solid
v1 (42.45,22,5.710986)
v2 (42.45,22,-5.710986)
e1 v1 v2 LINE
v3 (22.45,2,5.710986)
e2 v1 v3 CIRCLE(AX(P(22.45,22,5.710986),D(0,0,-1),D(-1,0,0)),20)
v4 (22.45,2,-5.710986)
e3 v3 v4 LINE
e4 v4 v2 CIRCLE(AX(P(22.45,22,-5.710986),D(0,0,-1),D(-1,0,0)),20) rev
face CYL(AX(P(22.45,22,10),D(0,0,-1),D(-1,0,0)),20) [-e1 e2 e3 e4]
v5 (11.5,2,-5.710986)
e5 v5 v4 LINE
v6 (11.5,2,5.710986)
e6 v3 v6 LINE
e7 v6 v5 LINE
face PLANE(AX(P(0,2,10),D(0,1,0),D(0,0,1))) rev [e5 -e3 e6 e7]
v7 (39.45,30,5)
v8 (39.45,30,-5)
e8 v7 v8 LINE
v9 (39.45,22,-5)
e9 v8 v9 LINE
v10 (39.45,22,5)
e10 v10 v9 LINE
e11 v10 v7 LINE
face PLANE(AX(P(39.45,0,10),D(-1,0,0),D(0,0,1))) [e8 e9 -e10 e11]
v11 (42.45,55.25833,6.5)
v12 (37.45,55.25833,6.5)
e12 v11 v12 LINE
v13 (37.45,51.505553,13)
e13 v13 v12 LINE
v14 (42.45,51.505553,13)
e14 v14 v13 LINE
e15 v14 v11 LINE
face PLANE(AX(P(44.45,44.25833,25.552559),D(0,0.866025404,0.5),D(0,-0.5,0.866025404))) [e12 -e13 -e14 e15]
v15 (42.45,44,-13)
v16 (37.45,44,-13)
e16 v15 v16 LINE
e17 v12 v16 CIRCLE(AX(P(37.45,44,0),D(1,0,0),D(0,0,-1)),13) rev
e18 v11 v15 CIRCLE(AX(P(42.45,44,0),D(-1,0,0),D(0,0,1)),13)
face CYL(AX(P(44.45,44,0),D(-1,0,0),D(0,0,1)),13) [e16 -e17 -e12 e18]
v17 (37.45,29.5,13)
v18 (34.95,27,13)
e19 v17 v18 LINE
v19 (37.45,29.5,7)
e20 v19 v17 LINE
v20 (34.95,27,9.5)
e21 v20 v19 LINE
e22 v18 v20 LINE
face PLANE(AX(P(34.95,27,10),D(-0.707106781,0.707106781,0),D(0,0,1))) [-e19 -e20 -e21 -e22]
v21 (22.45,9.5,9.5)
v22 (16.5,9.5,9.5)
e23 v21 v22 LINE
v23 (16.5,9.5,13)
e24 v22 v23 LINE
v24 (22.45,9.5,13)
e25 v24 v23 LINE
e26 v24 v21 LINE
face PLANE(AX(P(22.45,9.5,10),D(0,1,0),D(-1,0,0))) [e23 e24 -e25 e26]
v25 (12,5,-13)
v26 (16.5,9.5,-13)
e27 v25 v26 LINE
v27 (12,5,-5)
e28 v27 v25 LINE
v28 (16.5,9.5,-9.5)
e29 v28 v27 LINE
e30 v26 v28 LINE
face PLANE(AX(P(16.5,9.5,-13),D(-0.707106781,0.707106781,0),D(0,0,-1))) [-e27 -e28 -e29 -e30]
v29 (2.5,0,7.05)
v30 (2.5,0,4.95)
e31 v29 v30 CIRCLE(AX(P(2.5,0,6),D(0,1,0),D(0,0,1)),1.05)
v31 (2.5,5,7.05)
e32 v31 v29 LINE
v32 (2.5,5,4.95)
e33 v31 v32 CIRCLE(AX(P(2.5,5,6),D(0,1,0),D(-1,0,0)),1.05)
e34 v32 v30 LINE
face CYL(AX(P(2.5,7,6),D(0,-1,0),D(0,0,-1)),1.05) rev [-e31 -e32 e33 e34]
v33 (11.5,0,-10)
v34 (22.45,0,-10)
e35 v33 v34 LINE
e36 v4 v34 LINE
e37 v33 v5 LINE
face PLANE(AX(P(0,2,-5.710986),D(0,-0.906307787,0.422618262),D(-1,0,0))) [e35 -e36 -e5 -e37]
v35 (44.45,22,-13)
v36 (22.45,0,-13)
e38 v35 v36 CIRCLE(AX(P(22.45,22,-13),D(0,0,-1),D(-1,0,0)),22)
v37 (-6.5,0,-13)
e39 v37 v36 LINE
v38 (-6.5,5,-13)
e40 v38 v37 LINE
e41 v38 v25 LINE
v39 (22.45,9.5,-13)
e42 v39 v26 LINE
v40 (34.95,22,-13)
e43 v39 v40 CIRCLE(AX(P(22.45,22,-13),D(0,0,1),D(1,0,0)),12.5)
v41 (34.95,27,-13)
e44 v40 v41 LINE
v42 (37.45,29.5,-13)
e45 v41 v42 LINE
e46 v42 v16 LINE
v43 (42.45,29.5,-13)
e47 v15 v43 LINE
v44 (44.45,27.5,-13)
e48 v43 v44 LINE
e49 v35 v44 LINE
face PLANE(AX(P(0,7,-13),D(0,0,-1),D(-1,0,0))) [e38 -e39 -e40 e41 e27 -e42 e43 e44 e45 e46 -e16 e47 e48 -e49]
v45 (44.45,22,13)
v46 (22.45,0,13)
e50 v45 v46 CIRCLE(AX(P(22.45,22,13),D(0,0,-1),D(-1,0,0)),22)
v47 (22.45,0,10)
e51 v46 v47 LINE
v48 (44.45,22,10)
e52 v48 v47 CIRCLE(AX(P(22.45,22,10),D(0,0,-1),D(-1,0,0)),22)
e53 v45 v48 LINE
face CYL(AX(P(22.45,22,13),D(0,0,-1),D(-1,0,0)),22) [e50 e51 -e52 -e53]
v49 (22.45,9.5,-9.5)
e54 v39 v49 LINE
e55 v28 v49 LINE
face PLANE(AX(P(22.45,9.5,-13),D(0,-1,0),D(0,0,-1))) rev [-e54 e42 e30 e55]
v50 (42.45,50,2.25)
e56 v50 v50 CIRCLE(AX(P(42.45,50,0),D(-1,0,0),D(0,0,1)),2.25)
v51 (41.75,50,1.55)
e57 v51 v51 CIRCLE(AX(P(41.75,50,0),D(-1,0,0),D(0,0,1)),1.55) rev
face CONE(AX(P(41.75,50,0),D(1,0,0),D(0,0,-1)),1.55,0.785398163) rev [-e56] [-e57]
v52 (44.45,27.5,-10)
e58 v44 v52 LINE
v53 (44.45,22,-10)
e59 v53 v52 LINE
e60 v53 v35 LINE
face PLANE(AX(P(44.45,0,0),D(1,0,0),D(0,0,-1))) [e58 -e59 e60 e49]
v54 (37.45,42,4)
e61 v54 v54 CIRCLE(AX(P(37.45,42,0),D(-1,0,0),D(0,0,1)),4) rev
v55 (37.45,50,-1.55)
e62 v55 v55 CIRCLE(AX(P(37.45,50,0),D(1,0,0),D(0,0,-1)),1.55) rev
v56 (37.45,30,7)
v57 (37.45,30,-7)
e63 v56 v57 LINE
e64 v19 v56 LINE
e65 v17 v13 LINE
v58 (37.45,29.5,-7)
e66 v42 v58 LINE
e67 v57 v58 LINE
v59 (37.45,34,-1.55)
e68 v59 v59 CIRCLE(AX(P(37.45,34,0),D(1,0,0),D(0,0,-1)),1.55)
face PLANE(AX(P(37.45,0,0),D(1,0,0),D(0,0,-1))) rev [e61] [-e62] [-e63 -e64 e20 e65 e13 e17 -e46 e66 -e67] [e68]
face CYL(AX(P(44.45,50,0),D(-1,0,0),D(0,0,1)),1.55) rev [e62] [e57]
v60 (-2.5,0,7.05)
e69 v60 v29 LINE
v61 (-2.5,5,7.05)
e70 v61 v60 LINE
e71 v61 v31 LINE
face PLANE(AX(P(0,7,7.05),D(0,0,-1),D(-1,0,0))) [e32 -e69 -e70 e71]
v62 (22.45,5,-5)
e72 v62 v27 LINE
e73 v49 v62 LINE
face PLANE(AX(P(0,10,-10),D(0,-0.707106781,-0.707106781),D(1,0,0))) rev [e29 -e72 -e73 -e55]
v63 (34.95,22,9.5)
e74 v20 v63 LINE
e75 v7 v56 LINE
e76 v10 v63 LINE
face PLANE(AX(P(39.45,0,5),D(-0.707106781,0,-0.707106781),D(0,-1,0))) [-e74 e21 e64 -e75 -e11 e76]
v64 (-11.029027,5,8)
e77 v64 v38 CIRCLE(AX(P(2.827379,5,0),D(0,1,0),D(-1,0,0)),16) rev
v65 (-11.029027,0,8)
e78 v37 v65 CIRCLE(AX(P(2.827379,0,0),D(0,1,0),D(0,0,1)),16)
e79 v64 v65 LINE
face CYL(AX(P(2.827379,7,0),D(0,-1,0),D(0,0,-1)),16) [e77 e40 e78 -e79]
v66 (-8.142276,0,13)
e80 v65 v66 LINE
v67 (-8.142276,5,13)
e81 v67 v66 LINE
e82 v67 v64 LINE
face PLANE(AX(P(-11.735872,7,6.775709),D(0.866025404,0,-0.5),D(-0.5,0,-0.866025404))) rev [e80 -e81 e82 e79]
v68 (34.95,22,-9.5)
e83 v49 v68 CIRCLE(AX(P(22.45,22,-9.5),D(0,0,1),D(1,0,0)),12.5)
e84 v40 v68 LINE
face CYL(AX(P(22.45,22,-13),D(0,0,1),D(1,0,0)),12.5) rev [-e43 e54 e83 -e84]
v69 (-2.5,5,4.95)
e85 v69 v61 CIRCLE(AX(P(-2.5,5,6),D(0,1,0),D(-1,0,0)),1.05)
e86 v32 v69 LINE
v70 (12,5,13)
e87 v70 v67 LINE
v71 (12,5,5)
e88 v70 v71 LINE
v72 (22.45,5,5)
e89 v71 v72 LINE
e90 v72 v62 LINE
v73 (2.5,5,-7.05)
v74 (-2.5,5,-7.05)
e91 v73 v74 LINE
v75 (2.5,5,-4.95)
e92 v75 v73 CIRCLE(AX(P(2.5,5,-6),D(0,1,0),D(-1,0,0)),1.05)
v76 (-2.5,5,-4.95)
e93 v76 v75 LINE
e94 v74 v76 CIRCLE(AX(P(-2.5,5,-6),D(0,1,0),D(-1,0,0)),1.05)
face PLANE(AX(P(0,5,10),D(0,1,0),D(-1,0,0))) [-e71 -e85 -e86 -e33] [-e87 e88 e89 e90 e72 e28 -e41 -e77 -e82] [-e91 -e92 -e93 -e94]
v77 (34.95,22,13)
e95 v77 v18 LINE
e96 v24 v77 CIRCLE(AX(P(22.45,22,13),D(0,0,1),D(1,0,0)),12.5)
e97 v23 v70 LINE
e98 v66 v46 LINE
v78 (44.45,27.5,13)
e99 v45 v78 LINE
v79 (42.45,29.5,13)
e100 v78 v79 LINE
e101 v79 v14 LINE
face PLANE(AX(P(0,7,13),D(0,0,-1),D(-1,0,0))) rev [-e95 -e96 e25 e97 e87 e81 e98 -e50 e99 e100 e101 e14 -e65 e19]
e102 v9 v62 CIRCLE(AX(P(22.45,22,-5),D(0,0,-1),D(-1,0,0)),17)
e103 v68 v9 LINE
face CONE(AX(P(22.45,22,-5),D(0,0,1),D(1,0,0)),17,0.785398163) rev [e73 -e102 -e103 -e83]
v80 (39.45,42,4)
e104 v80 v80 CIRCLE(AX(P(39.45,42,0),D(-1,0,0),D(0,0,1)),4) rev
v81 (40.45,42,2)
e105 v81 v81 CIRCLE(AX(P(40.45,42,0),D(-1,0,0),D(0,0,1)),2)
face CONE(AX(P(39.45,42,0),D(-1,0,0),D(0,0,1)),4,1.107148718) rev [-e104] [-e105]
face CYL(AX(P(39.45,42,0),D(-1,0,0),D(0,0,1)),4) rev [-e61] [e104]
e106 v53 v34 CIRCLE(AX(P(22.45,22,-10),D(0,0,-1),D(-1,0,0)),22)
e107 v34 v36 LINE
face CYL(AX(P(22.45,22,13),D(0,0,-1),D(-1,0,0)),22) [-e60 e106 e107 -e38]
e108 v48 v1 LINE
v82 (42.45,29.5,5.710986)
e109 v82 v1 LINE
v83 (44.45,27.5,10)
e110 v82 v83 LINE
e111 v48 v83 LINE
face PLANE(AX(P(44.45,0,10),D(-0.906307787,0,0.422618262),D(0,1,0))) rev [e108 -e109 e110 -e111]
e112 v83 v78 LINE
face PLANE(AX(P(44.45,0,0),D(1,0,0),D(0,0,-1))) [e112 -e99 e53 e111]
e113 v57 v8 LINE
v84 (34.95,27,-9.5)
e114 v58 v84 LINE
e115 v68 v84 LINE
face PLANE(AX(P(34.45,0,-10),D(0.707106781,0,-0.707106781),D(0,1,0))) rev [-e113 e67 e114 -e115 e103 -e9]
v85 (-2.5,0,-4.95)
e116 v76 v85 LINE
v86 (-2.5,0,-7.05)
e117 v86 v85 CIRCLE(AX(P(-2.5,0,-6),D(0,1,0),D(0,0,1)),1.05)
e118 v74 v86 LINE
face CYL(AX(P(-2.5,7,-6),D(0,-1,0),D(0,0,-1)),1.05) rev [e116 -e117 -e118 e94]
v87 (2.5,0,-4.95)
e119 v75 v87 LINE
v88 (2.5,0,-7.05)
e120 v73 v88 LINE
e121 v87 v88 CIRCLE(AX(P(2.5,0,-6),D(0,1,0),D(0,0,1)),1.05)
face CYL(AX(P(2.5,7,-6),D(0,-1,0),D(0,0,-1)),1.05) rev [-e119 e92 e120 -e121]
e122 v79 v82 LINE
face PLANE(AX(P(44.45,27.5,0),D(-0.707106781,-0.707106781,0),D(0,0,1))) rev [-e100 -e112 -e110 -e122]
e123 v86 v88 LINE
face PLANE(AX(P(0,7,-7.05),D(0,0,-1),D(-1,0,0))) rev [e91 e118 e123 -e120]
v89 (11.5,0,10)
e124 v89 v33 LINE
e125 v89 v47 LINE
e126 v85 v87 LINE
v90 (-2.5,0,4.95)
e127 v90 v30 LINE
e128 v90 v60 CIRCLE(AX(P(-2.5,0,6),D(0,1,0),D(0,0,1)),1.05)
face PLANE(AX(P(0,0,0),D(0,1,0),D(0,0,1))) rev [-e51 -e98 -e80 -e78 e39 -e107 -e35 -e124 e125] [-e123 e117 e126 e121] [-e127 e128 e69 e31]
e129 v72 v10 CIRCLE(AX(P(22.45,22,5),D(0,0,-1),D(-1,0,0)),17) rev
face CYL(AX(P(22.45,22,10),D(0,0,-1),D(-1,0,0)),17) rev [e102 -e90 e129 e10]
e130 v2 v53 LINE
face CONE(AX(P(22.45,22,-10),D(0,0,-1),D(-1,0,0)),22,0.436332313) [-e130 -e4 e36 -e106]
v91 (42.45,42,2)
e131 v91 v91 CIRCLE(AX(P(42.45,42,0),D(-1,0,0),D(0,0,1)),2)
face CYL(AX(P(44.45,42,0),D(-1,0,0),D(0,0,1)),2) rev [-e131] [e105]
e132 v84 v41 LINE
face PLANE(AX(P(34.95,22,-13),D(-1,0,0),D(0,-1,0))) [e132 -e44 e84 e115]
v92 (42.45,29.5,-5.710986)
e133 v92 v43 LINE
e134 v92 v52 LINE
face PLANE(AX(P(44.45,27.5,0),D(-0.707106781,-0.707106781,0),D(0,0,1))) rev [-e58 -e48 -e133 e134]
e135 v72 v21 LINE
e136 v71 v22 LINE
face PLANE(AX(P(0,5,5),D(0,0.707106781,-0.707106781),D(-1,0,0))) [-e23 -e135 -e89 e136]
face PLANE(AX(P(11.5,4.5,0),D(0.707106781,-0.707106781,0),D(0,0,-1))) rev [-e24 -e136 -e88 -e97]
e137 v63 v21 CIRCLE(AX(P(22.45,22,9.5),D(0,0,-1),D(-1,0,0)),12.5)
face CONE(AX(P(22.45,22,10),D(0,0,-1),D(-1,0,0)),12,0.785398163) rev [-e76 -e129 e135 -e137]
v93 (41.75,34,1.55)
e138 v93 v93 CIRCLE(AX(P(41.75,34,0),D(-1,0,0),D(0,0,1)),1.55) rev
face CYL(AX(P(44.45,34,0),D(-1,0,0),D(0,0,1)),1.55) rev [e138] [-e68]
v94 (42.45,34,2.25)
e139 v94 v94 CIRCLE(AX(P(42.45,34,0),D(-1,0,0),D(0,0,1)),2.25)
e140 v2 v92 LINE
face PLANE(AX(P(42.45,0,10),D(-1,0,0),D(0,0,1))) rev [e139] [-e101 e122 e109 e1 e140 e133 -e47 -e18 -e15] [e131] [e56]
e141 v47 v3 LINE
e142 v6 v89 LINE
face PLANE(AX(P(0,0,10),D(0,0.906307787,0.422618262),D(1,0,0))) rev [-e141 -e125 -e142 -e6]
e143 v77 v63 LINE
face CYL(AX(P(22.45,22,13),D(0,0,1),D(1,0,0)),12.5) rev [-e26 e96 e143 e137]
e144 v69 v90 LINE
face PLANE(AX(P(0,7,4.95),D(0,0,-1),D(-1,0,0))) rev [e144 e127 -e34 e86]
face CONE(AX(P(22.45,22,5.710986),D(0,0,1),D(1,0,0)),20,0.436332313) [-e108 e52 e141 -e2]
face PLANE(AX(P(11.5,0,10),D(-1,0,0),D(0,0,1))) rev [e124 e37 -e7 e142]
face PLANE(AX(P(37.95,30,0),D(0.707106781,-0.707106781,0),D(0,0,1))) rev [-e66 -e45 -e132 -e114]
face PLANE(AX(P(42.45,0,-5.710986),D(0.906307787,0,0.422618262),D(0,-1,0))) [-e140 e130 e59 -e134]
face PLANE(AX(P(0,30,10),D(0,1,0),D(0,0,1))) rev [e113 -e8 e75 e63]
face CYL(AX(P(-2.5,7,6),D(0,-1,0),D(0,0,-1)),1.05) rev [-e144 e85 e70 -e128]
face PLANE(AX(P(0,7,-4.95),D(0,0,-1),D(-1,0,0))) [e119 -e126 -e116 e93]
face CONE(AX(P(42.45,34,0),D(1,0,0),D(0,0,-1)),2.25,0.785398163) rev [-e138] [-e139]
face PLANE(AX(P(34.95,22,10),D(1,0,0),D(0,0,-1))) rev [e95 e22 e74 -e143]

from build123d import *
from OCP.BRepFilletAPI import BRepFilletAPI_MakeChamfer

# Parameters (mm, degrees)
BOSS_EXTRUDE1_DEPTH = 7
SKETCH2_R           = 2
SKETCH2_R_2         = 1.55
BOSS_EXTRUDE2_DEPTH = 7
BOSS_EXTRUDE3_START = -13
BOSS_EXTRUDE3_DEPTH = 26
CUT_EXTRUDE3_DEPTH  = 77.816681
CUT_EXTRUDE6_DEPTH  = 10
CUT_EXTRUDE8_START  = -2
CUT_EXTRUDE8_DEPTH  = 2
CUT_EXTRUDE10_START = 2
CUT_EXTRUDE10_DEPTH = 2
SKETCH17_W          = 3
SKETCH17_H          = 2.5
SWEEP1_START        = -13
SWEEP1_DEPTH        = 3
CHAMFER3_SIZE       = 4.289014
CHAMFER3_SIZE_2     = 2
CHAMFER1_SIZE       = 0.7
CHAMFER7_SIZE       = 2.5
CHAMFER8_SIZE       = 4.289014
CHAMFER8_SIZE_2     = 2
CHAMFER9_SIZE       = 5
SKETCH14_R          = 4
CUT_EXTRUDE12_DEPTH = 2
CHAMFER11_SIZE2     = 2
CHAMFER11_SIZE      = 1
CHAMFER12_SIZE      = 3
CHAMFER13_SIZE      = 5


# Read off the part's stored shape, not the designer's step: Sweep1
# Some blends are built 0.0001 mm under size
with BuildPart() as part:
    # Sketch1 → Boss-Extrude1 (new body)
    # profile 1 of 2: a face of its own
    with BuildSketch(Plane(origin=(0, 0, 0), x_dir=(1, 0, 0), z_dir=(0, 1, 0))):
        with BuildLine():
            Line((-6.5, 13), (37.45, 13))
            Line((37.45, 13), (37.45, -13))
            Line((37.45, -13), (0, -13))
            Line((0, -13), (-8.142276, -13))
            Line((-8.142276, -13), (-11.029027, -8))
            ThreePointArc((-11.029027, -8), (-12.813017, 3.373132), (-6.5, 13))
        make_face()
        with BuildLine():
            ThreePointArc((-2.5, 2), (-4.5, 0), (-2.5, -2))
            Line((-2.5, -2), (2.5, -2))
            ThreePointArc((2.5, -2), (4.5, 0), (2.5, 2))
            Line((2.5, 2), (-2.5, 2))
        make_face(mode=Mode.SUBTRACT)
        with BuildLine():
            ThreePointArc((2.5, -7.05), (3.55, -6), (2.5, -4.95))
            Line((2.5, -4.95), (-2.5, -4.95))
            ThreePointArc((-2.5, -4.95), (-3.55, -6), (-2.5, -7.05))
            Line((-2.5, -7.05), (2.5, -7.05))
        make_face(mode=Mode.SUBTRACT)
        with BuildLine():
            ThreePointArc((2.5, 4.95), (3.55, 6), (2.5, 7.05))
            Line((2.5, 7.05), (-2.5, 7.05))
            ThreePointArc((-2.5, 7.05), (-3.55, 6), (-2.5, 4.95))
            Line((-2.5, 4.95), (2.5, 4.95))
        make_face(mode=Mode.SUBTRACT)
    # profile 2 of 2: a face of its own
    with BuildSketch(Plane(origin=(0, 0, 0), x_dir=(1, 0, 0), z_dir=(0, 1, 0))):
        with BuildLine():
            Line((2.5, 2), (-2.5, 2))
            ThreePointArc((-2.5, 2), (-4.5, 0), (-2.5, -2))
            Line((-2.5, -2), (2.5, -2))
            ThreePointArc((2.5, -2), (4.5, 0), (2.5, 2))
        make_face()
    extrude(amount=BOSS_EXTRUDE1_DEPTH)

    # Sketch2 → Boss-Extrude2 (add)
    with BuildSketch(Plane(origin=(37.45, 0, 0), x_dir=(0, 0, -1), z_dir=(1, 0, 0))):
        with BuildLine():
            Line((-13, 51.505553), (-13, 0))
            Line((-13, 0), (13, 0))
            Line((13, 0), (13, 44))
            ThreePointArc((13, 44), (6.5, 55.25833), (-6.5, 55.25833))
            Line((-6.5, 55.25833), (-13, 51.505553))
        make_face()
        with Locations((0, 42)):
            Circle(SKETCH2_R, mode=Mode.SUBTRACT)
        with Locations((0, 50)):
            Circle(SKETCH2_R_2, mode=Mode.SUBTRACT)
        with Locations((0, 34)):
            Circle(SKETCH2_R_2, mode=Mode.SUBTRACT)
    extrude(amount=BOSS_EXTRUDE2_DEPTH)

    # Sketch3 → Boss-Extrude3 (add)
    with BuildSketch(Plane.XY.offset(BOSS_EXTRUDE3_START)):
        with BuildLine():
            Line((22.45, 7), (37.45, 7))
            Line((37.45, 7), (37.45, 22))
            ThreePointArc((37.45, 22), (33.056602, 11.393398), (22.45, 7))
        make_face()
    extrude(amount=BOSS_EXTRUDE3_DEPTH)

    # Sketch6 → Cut-Extrude3 (cut, through all)
    with BuildSketch(Plane(origin=(0, 0, -13), x_dir=(-1, 0, 0), z_dir=(0, 0, -1))):
        with BuildLine():
            Line((-22.45, 0), (-44.45, 0))
            Line((-44.45, 0), (-44.45, 22))
            ThreePointArc((-44.45, 22), (-38.006349, 6.443651), (-22.45, 0))
        make_face()
    extrude(amount=-CUT_EXTRUDE3_DEPTH, mode=Mode.SUBTRACT)

    # Sketch8 → Cut-Extrude6 (cut, symmetric)
    with BuildSketch(Plane(origin=(0, 0, 0), x_dir=(-1, 0, 0), z_dir=(0, 0, -1))):
        with BuildLine():
            Line((-37.45, 22), (-37.45, 30))
            Line((-37.45, 30), (-39.45, 30))
            Line((-39.45, 30), (-39.45, 22))
            ThreePointArc((-39.45, 22), (-34.470815, 9.979185), (-22.45, 5))
            Line((-22.45, 5), (-11.5, 5))
            Line((-11.5, 5), (-11.5, 7))
            Line((-11.5, 7), (-22.45, 7))
            ThreePointArc((-22.45, 7), (-33.056602, 11.393398), (-37.45, 22))
        make_face()
        with BuildLine():
            Line((-11.5, 0), (-22.45, 0))
            ThreePointArc((-22.45, 0), (-38.006349, 6.443651), (-44.45, 22))
            Line((-44.45, 22), (-44.45, 30))
            Line((-44.45, 30), (-42.45, 30))
            Line((-42.45, 30), (-42.45, 22))
            ThreePointArc((-42.45, 22), (-36.592136, 7.857864), (-22.45, 2))
            Line((-22.45, 2), (-11.5, 2))
            Line((-11.5, 2), (-11.5, 0))
        make_face()
    extrude(amount=CUT_EXTRUDE6_DEPTH, both=True, mode=Mode.SUBTRACT)

    # Sketch10 → Cut-Extrude8 (cut)
    with BuildSketch(Plane(origin=(0, 7, 0), x_dir=(1, 0, 0), z_dir=(0, 1, 0)).offset(CUT_EXTRUDE8_START)):
        with BuildLine():
            Line((11.5, 10), (11.5, 13))
            Line((11.5, 13), (-6.5, 13))
            ThreePointArc((-6.5, 13), (-12.813017, 3.373132), (-11.029027, -8))
            Line((-11.029027, -8), (-8.142276, -13))
            Line((-8.142276, -13), (11.5, -13))
            Line((11.5, -13), (11.5, -10))
            Line((11.5, -10), (11.5, 10))
        make_face()
    extrude(amount=CUT_EXTRUDE8_DEPTH, mode=Mode.SUBTRACT)

    # Sketch12 → Cut-Extrude10 (cut)
    with BuildSketch(Plane.ZY.offset(-44.45).offset(CUT_EXTRUDE10_START)):
        with BuildLine():
            Line((-13, 30), (13, 30))
            Line((13, 30), (13, 51.505553))
            Line((13, 51.505553), (6.5, 55.25833))
            ThreePointArc((6.5, 55.25833), (-6.5, 55.25833), (-13, 44))
            Line((-13, 44), (-13, 30))
        make_face()
    extrude(amount=-CUT_EXTRUDE10_DEPTH, mode=Mode.SUBTRACT)

    # Sweep2: sweep along a path in Sketch18
    with BuildLine(Plane.XY.offset(13)) as sweep2_path:
        Line((11.5, 7), (22.45, 7))
        ThreePointArc((22.45, 7), (33.056602, 11.393398), (37.45, 22))
        Line((37.45, 22), (37.45, 30))
    # Sketch17 → Sweep2 (sweep)
    with BuildSketch(Plane.ZY.offset(-11.5)):
        with Locations((11.5, 8.25)):
            Rectangle(SKETCH17_W, SKETCH17_H)
    sweep(path=sweep2_path.line)

    # Sweep1 outline → Sweep1 (add)
    with BuildSketch(Plane.XY.offset(SWEEP1_START)):
        with BuildLine():
            Line((22.45, 9.5), (11.5, 9.5))
            Line((11.5, 9.5), (11.5, 7))
            Line((11.5, 7), (22.45, 7))
            ThreePointArc((22.45, 7), (33.056602, 11.393398), (37.45, 22))
            Line((37.45, 22), (37.45, 30))
            Line((37.45, 30), (34.95, 30))
            Line((34.95, 30), (34.95, 22))
            ThreePointArc((34.95, 22), (31.288835, 13.161165), (22.45, 9.5))
        make_face()
    extrude(amount=SWEEP1_DEPTH)

    # Chamfer3
    chamfer3_edges_1 = [part.edges().sort_by_distance(p)[0] for p in [
        (42.45, 26, 10),
    ]]
    chamfer3_side_1 = [part.faces().sort_by_distance(p)[0] for p in [
        (42.45, 26, 9.96),
    ]]
    chamfer3_edges_2 = [part.edges().sort_by_distance(p)[0] for p in [
        (16.975, 2, 10),
    ]]
    chamfer3_side_2 = [part.faces().sort_by_distance(p)[0] for p in [
        (16.975, 1.96, 10),
    ]]
    chamfer3_edges_3 = [part.edges().sort_by_distance(p)[0] for p in [
        (36.592136, 7.857864, 10),
    ]]
    chamfer3_side_3 = [part.faces().sort_by_distance(p)[0] for p in [
        (36.62042, 7.82958, 10),
    ]]
    chamfer3 = BRepFilletAPI_MakeChamfer(part.part.solid().wrapped)
    for e in chamfer3_edges_1:
        chamfer3.Add(CHAMFER3_SIZE - 0.0001, CHAMFER3_SIZE_2 - 0.0001, e.wrapped, chamfer3_side_1[0].wrapped)
    for e in chamfer3_edges_2:
        chamfer3.Add(CHAMFER3_SIZE_2 - 0.0001, CHAMFER3_SIZE - 0.0001, e.wrapped, chamfer3_side_2[0].wrapped)
    for e in chamfer3_edges_3:
        chamfer3.Add(CHAMFER3_SIZE_2 - 0.0001, CHAMFER3_SIZE - 0.0001, e.wrapped, chamfer3_side_3[0].wrapped)
    add(Compound.cast(chamfer3.Shape()), mode=Mode.REPLACE)  # a hair under: the kernel refuses the full size

    # Chamfer4
    # the kernel refuses this chamfer: 5 mm, written as the material it adds along each edge
    with BuildSketch(Plane(origin=(39.45, 30, -10), x_dir=(-0.9996219169112968, 0, -0.027495876610586317), z_dir=(0, -1, 0))) as chamfer4_piece_1_section:
        with BuildLine():
            Line((5.143366, 0), (-0.282736, -5.135589))
            Line((-0.282736, -5.135589), (-0.382698, -5.132839))
            ThreePointArc((-0.382698, -5.132839), (-0.170646, -2.566989), (-0.099962, 0.00275))
            Line((-0.099962, 0.00275), (0.00275, 0.099962))
            ThreePointArc((0.00275, 0.099962), (2.572488, 0.029278), (5.146116, 0.099962))
            Line((5.146116, 0.099962), (5.143366, 0))
        make_face()
    chamfer4_piece_1 = extrude(amount=8, mode=Mode.PRIVATE)
    chamfer4_piece_1 = split(chamfer4_piece_1, bisect_by=Plane(origin=(34.95, 26, -8.320496), z_dir=(1, 0, 0)), keep=Keep.TOP, mode=Mode.PRIVATE)
    add(chamfer4_piece_1)
    with BuildSketch(Plane(origin=(22.45, 22, -10), x_dir=(1, 0, 0), z_dir=(0, 1, 0))) as chamfer4_piece_2_section:
        with BuildLine():
            Line((11.858579, 0.141421), (17.141421, -5.141421))
            Line((17.141421, -5.141421), (17.241421, -5.141421))
            ThreePointArc((17.241421, -5.141421), (17.1, -2.570711), (17.1, 0))
            Line((17.1, 0), (17, 0.1))
            ThreePointArc((17, 0.1), (14.429289, 0.1), (11.858579, 0.241421))
            Line((11.858579, 0.241421), (11.858579, 0.141421))
        make_face()
    chamfer4_piece_2 = revolve(axis=Axis((22.45, 22, -10), (0, 0, -1)), revolution_arc=90, mode=Mode.PRIVATE)
    chamfer4_piece_2 = chamfer4_piece_2 - Plane(origin=(22.45, 22, -8.725306), x_dir=(1.0, 4.5928914007453734e-11, 0), z_dir=(0, 0, -1)) * Cylinder(12.5, 69, mode=Mode.PRIVATE)
    add(chamfer4_piece_2)
    with BuildSketch(Plane(origin=(22.45, 5, -10), x_dir=(0, -0.02749587661058649, 0.9996219169112968), z_dir=(-1, 0, 0))) as chamfer4_piece_3_section:
        with BuildLine():
            Line((5.143366, 0), (-0.282736, 5.135589))
            Line((-0.282736, 5.135589), (-0.382698, 5.132839))
            ThreePointArc((-0.382698, 5.132839), (-0.170646, 2.566989), (-0.099962, -0.00275))
            Line((-0.099962, -0.00275), (0.00275, -0.099962))
            ThreePointArc((0.00275, -0.099962), (2.572488, -0.029278), (5.146116, -0.099962))
            Line((5.146116, -0.099962), (5.143366, 0))
        make_face()
    chamfer4_piece_3 = extrude(amount=10.95, mode=Mode.PRIVATE)
    chamfer4_piece_3 = split(chamfer4_piece_3, bisect_by=Plane(origin=(16.975, 9.5, -8.320496), z_dir=(0, -1, 0)), keep=Keep.TOP, mode=Mode.PRIVATE)
    add(chamfer4_piece_3)

    # Chamfer1
    chamfer1_edges = [part.edges().sort_by_distance(p)[0] for p in [
        (42.45, 34, 1.55),
        (42.45, 50, 1.55),
    ]]
    chamfer(chamfer1_edges, length=CHAMFER1_SIZE)

    # Chamfer7
    # the kernel refuses this chamfer: 2.5 mm, written as the material it takes off along each edge
    with BuildSketch(Plane(origin=(44.45, 30, 3.570793), x_dir=(-0.9996219169112968, 0.027495876610586282, 0), z_dir=(0, 0, 1))) as chamfer7_piece_1_section:
        Polygon((CHAMFER7_SIZE * 0.999621916911, CHAMFER7_SIZE * 0.0274958766106), (-CHAMFER7_SIZE * 0.0274958766106, CHAMFER7_SIZE * 0.999621916911), (0, 0), align=None)
    chamfer7_piece_1 = extrude(amount=15.858415, mode=Mode.PRIVATE)
    chamfer7_piece_1 = split(chamfer7_piece_1, bisect_by=Plane(origin=(42.45, 29.135704, 11.5), z_dir=(1, 0, 0)), keep=Keep.TOP, mode=Mode.PRIVATE)
    add(chamfer7_piece_1, mode=Mode.SUBTRACT)
    with BuildSketch(Plane(origin=(44.45, 30, -19.429207), x_dir=(-0.9996219169112968, 0.027495876610586282, 0), z_dir=(0, 0, 1))) as chamfer7_piece_2_section:
        Polygon((CHAMFER7_SIZE * 0.999621916911, CHAMFER7_SIZE * 0.0274958766106), (-CHAMFER7_SIZE * 0.0274958766106, CHAMFER7_SIZE * 0.999621916911), (0, 0), align=None)
    chamfer7_piece_2 = extrude(amount=15.858415, mode=Mode.PRIVATE)
    chamfer7_piece_2 = split(chamfer7_piece_2, bisect_by=Plane(origin=(42.45, 29.135704, -11.5), z_dir=(1, 0, 0)), keep=Keep.TOP, mode=Mode.PRIVATE)
    add(chamfer7_piece_2, mode=Mode.SUBTRACT)

    # Chamfer8
    chamfer8_edges_1 = [part.edges().sort_by_distance(p)[0] for p in [
        (42.45, 25.75, -10),
    ]]
    chamfer8_side_1 = [part.faces().sort_by_distance(p)[0] for p in [
        (42.45, 25.75, -9.96),
    ]]
    chamfer8_edges_2 = [part.edges().sort_by_distance(p)[0] for p in [
        (16.975, 2, -10),
    ]]
    chamfer8_side_2 = [part.faces().sort_by_distance(p)[0] for p in [
        (16.975, 2, -9.96),
    ]]
    chamfer8_edges_3 = [part.edges().sort_by_distance(p)[0] for p in [
        (36.592136, 7.857864, -10),
    ]]
    chamfer8_side_3 = [part.faces().sort_by_distance(p)[0] for p in [
        (36.62042, 7.82958, -10),
    ]]
    chamfer8 = BRepFilletAPI_MakeChamfer(part.part.solid().wrapped)
    for e in chamfer8_edges_1:
        chamfer8.Add(CHAMFER8_SIZE - 0.0001, CHAMFER8_SIZE_2 - 0.0001, e.wrapped, chamfer8_side_1[0].wrapped)
    for e in chamfer8_edges_2:
        chamfer8.Add(CHAMFER8_SIZE - 0.0001, CHAMFER8_SIZE_2 - 0.0001, e.wrapped, chamfer8_side_2[0].wrapped)
    for e in chamfer8_edges_3:
        chamfer8.Add(CHAMFER8_SIZE_2 - 0.0001, CHAMFER8_SIZE - 0.0001, e.wrapped, chamfer8_side_3[0].wrapped)
    add(Compound.cast(chamfer8.Shape()), mode=Mode.REPLACE)  # a hair under: the kernel refuses the full size

    # Chamfer9
    # the kernel refuses this chamfer: 5 mm, written as the material it adds along each edge
    with BuildSketch(Plane(origin=(39.45, 30, 10), x_dir=(-0.9996219169112968, 0, 0.027495876610586317), z_dir=(0, -1, 0))) as chamfer9_piece_1_section:
        Polygon((CHAMFER9_SIZE * 0.999621916911, CHAMFER9_SIZE * 0.0274958766106), (-CHAMFER9_SIZE * 0.0274958766106, CHAMFER9_SIZE * 0.999621916911), (0, 0), align=None)
    chamfer9_piece_1 = extrude(amount=8, mode=Mode.PRIVATE)
    chamfer9_piece_1 = split(chamfer9_piece_1, bisect_by=Plane(origin=(34.95, 27.933854, 7.772938), z_dir=(1, 0, 0)), keep=Keep.TOP, mode=Mode.PRIVATE)
    add(chamfer9_piece_1)
    with BuildSketch(Plane(origin=(22.45, 5, 10), x_dir=(0, 0.9996219169112968, 0.027495876610586324), z_dir=(-1, 0, 0))) as chamfer9_piece_2_section:
        Polygon((CHAMFER9_SIZE * 0.999621916911, CHAMFER9_SIZE * 0.0274958766106), (-CHAMFER9_SIZE * 0.0274958766106, CHAMFER9_SIZE * 0.999621916911), (0, 0), align=None)
    chamfer9_piece_2 = extrude(amount=10.95, mode=Mode.PRIVATE)
    chamfer9_piece_2 = split(chamfer9_piece_2, bisect_by=Plane(origin=(18.429736, 9.5, 8.798086), z_dir=(0, -1, 0)), keep=Keep.TOP, mode=Mode.PRIVATE)
    add(chamfer9_piece_2)
    with BuildSketch(Plane(origin=(22.45, 22, 10), x_dir=(1, 0, 0), z_dir=(0, 1, 0))) as chamfer9_piece_3_section:
        Polygon((17 - CHAMFER9_SIZE, 0), (17, CHAMFER9_SIZE), (17, 0), align=None)
    chamfer9_piece_3 = revolve(axis=Axis((22.45, 22, 10), (0, 0, -1)), revolution_arc=90, mode=Mode.PRIVATE)
    chamfer9_piece_3 = chamfer9_piece_3 - Plane(origin=(22.45, 22, 8.660678), x_dir=(0, -1, 0), z_dir=(0, 0, -1)) * Cylinder(12.5, 69, mode=Mode.PRIVATE)
    add(chamfer9_piece_3)

    # Sketch14 → Cut-Extrude12 (cut)
    with BuildSketch(Plane(origin=(37.45, 0, 0), x_dir=(0, 0, -1), z_dir=(1, 0, 0))):
        with Locations(Location((0, 42, 0), (0, 0, 180))):
            Circle(SKETCH14_R)
    extrude(amount=CUT_EXTRUDE12_DEPTH, mode=Mode.SUBTRACT)

    # Chamfer11
    chamfer11_edges = [part.edges().sort_by_distance(p)[0] for p in [
        (39.45, 42, 2),
    ]]
    chamfer11_side = [part.faces().sort_by_distance(p)[0] for p in [
        (39.47, 42, 2),
    ]]
    chamfer(chamfer11_edges, length=CHAMFER11_SIZE - 0.0001, length2=CHAMFER11_SIZE2 - 0.0001, reference=chamfer11_side[0])  # a hair under: the kernel refuses the full size

    # Chamfer12
    # the kernel refuses this chamfer: 3 mm, written as the material it takes off along each edge
    with BuildSketch(Plane(origin=(34.95, 30, -20.715049), x_dir=(-0.027495876610586768, -0.9996219169112968, 0), z_dir=(0, 0, 1))) as chamfer12_piece_1_section:
        Polygon((CHAMFER12_SIZE * 0.999621916911, CHAMFER12_SIZE * 0.0274958766106), (-CHAMFER12_SIZE * 0.0274958766106, CHAMFER12_SIZE * 0.999621916911), (0, 0), align=None)
    chamfer12_piece_1 = extrude(amount=18.930098, mode=Mode.PRIVATE)
    chamfer12_piece_1 = split(chamfer12_piece_1, bisect_by=Plane(origin=(37.45, 28.97392, -11.25), z_dir=(-1, 0, 0)), keep=Keep.TOP, mode=Mode.PRIVATE)
    add(chamfer12_piece_1, mode=Mode.SUBTRACT)
    with BuildSketch(Plane(origin=(34.95, 30, 1.784951), x_dir=(0.9996219169112965, 0.02749587661058676, 1.4233391824783543e-14), z_dir=(0, 0, 1))) as chamfer12_piece_2_section:
        Polygon((CHAMFER12_SIZE * 0.999621916911, -CHAMFER12_SIZE * 0.0274958766106), (-CHAMFER12_SIZE * 0.0274958766106, -CHAMFER12_SIZE * 0.999621916911), (0, 0), align=None)
    chamfer12_piece_2 = extrude(amount=18.930098, mode=Mode.PRIVATE)
    chamfer12_piece_2 = split(chamfer12_piece_2, bisect_by=Plane(origin=(37.45, 28.97392, 11.25), z_dir=(-1, 0, 0)), keep=Keep.TOP, mode=Mode.PRIVATE)
    add(chamfer12_piece_2, mode=Mode.SUBTRACT)

    # Chamfer13
    # the kernel refuses this chamfer: 5 mm, written as the material it takes off along each edge
    with BuildSketch(Plane(origin=(11.5, 9.5, 25.858415), x_dir=(0.9996219169112968, 0.027495876610586317, 1.5220159105039985e-15), z_dir=(0, 0, -1))) as chamfer13_piece_1_section:
        Polygon((CHAMFER13_SIZE * 0.999621916911, CHAMFER13_SIZE * 0.0274958766106), (-CHAMFER13_SIZE * 0.0274958766106, CHAMFER13_SIZE * 0.999621916911), (0, 0), align=None)
    chamfer13_piece_1 = extrude(amount=29.21683, mode=Mode.PRIVATE)
    chamfer13_piece_1 = split(chamfer13_piece_1, bisect_by=Plane(origin=(13.179504, 5, 11.25), z_dir=(0, 1, 0)), keep=Keep.TOP, mode=Mode.PRIVATE)
    add(chamfer13_piece_1, mode=Mode.SUBTRACT)
    with BuildSketch(Plane(origin=(11.5, 9.5, -25.858415), x_dir=(-0.027495876610586317, -0.9996219169112968, 0), z_dir=(0, 0, 1))) as chamfer13_piece_2_section:
        Polygon((CHAMFER13_SIZE * 0.999621916911, CHAMFER13_SIZE * 0.0274958766106), (-CHAMFER13_SIZE * 0.0274958766106, CHAMFER13_SIZE * 0.999621916911), (0, 0), align=None)
    chamfer13_piece_2 = extrude(amount=29.21683, mode=Mode.PRIVATE)
    chamfer13_piece_2 = split(chamfer13_piece_2, bisect_by=Plane(origin=(13.179504, 5, -11.25), z_dir=(0, 1, 0)), keep=Keep.TOP, mode=Mode.PRIVATE)
    add(chamfer13_piece_2, mode=Mode.SUBTRACT)


solid = part.part
